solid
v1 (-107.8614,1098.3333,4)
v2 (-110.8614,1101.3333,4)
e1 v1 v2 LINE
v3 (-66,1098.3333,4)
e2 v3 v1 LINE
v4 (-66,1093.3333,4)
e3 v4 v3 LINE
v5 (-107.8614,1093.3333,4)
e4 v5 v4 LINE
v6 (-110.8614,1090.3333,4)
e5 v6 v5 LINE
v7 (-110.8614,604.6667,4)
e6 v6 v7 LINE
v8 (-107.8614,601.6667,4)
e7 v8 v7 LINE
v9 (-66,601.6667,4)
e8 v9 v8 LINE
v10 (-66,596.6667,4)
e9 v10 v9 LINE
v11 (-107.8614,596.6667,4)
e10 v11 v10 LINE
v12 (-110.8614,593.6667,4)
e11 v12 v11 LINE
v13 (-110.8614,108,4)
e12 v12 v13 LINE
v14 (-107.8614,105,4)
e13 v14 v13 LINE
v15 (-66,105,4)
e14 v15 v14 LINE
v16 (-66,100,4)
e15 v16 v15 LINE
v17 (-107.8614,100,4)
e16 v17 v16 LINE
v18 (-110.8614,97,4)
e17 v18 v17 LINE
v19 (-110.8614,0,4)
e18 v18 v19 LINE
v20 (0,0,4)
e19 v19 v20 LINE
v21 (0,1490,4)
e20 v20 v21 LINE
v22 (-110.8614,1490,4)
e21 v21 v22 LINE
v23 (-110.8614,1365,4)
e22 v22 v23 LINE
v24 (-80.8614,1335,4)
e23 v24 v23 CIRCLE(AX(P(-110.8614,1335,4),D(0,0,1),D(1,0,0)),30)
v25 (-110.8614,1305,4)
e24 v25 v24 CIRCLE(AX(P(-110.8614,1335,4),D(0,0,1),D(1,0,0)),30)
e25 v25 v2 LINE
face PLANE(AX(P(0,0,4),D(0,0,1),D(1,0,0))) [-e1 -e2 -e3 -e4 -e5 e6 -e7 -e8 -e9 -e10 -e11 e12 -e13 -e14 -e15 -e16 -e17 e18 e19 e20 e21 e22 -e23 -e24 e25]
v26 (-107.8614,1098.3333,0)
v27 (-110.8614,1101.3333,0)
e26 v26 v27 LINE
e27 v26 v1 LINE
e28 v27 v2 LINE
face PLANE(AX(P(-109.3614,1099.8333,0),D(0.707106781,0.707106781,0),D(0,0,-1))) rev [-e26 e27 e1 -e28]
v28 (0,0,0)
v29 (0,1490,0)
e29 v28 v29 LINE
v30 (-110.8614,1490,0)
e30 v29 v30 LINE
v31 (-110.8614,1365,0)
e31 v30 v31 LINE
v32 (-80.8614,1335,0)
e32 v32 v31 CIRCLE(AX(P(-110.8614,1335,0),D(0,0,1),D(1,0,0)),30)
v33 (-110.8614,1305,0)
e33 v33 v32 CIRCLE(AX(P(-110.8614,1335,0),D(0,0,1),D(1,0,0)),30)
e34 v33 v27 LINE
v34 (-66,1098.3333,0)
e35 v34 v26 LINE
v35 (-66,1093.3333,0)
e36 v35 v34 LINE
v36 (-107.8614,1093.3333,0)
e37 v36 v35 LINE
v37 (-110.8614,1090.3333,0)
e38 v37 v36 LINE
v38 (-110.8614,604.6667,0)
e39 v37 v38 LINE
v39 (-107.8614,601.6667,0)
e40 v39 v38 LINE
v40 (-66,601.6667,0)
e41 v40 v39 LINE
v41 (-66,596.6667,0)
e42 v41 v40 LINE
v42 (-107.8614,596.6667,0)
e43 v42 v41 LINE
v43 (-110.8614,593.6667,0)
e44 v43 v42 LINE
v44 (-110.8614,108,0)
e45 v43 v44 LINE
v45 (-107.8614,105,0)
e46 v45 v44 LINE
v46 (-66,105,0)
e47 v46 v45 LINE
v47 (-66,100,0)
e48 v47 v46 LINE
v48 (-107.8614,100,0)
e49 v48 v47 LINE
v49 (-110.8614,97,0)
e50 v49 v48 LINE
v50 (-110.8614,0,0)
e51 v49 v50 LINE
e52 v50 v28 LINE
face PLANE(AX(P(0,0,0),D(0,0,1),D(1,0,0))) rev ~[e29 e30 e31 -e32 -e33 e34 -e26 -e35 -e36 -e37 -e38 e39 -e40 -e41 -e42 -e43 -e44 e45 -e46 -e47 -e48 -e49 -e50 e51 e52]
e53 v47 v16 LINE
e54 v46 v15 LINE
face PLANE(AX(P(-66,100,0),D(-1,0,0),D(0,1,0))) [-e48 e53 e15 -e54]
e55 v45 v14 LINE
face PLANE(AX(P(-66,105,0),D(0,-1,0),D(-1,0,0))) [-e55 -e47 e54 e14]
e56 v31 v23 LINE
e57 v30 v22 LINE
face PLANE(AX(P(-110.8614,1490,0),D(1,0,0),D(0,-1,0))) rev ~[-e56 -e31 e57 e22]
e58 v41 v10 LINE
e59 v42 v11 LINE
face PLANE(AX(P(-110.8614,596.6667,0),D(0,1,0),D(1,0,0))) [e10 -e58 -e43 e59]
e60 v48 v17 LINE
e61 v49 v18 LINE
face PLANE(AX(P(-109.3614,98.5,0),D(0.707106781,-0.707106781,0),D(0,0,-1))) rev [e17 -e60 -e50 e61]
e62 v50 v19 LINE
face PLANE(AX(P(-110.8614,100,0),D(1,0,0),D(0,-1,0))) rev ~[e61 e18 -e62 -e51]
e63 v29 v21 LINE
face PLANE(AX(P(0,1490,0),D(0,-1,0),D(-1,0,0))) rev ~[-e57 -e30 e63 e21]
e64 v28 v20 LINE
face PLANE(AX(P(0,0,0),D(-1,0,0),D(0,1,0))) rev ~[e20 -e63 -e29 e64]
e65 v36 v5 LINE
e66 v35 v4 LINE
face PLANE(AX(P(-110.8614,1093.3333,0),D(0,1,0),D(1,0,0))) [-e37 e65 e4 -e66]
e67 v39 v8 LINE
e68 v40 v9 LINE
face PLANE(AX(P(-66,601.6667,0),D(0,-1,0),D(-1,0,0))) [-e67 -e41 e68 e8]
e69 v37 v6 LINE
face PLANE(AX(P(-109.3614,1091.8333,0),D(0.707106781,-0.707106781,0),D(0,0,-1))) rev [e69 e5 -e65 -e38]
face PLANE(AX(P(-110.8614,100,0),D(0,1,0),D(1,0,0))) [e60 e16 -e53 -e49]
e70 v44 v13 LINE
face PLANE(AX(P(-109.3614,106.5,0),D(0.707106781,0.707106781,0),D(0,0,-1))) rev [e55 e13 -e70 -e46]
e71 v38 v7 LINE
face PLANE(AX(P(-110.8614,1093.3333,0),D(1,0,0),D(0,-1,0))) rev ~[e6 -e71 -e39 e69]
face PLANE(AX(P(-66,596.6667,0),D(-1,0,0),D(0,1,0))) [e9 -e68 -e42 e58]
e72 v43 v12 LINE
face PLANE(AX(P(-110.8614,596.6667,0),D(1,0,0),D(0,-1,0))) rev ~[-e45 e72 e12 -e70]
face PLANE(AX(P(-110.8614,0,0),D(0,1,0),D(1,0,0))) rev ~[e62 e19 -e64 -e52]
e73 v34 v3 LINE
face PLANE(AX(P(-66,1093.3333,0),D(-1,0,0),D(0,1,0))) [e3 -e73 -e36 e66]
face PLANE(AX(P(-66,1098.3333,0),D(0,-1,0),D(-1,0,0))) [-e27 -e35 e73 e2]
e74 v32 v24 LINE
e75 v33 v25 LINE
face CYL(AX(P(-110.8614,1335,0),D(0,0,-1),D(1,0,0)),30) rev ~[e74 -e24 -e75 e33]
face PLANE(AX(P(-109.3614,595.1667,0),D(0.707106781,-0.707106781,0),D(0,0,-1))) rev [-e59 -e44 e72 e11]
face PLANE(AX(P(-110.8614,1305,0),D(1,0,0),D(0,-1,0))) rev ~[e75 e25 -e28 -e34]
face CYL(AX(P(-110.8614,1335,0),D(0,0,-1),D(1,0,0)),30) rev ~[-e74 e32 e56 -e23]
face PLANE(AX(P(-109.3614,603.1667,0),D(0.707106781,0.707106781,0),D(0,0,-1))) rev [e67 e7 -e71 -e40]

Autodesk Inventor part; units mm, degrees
ref_plane "YZ Plane" through (0, 0, 0) normal (1, 0, 0) x (0, 1, 0)
ref_plane "XZ Plane" through (0, 0, 0) normal (0, 1, 0) x (-1, 0, 0)
ref_plane "XY Plane" through (0, 0, 0) normal (0, 0, 1) x (1, 0, 0)
sketch "Sketch1" plane through (0, 0, 0) normal (0, 0, 1) x (1, 0, 0)
  line L0 (0, 1490) -> (-110.8614, 1490)
  line L1 (-110.8614, 1490) -> (-110.8614, 0)
  line L2 (-110.8614, 0) -> (0, 0)
  line L3 (0, 0) -> (0, 1490)
  line L4 (-110.8614, 100) -> (-66, 100)
  line L5 (-66, 100) -> (-66, 105)
  line L6 (-66, 105) -> (-110.8614, 105)
  line L7 (-110.8614, 105) -> (-110.8614, 100)
  line L8 (-110.8614, 596.6667) -> (-66, 596.6667)
  line L9 (-66, 596.6667) -> (-66, 601.6667)
  line L10 (-66, 601.6667) -> (-110.8614, 601.6667)
  line L11 (-110.8614, 601.6667) -> (-110.8614, 596.6667)
  line L12 (-110.8614, 1093.3333) -> (-66, 1093.3333)
  line L13 (-66, 1093.3333) -> (-66, 1098.3333)
  line L14 (-66, 1098.3333) -> (-110.8614, 1098.3333)
  line L15 (-110.8614, 1098.3333) -> (-110.8614, 1093.3333)
  circle A0 centre (-110.8614, 1335) radius 30
  point P0 (-110.8614, 1098.3333)
  point P1 (-110.8614, 1093.3333)
  point P2 (-110.8614, 601.6667)
  point P3 (-110.8614, 596.6667)
  point P4 (-110.8614, 105)
  point P5 (-110.8614, 1365)
  point P6 (-110.8614, 1305)
  dimension "d0" = 1490
  dimension "d1" = 110.8614
  dimension "d2" = 5
  dimension "d4" = 100
  dimension "d7" = 496.6667
  dimension "d23" = 66
  dimension "d29" = 60
  dimension "d30" = 1335
extrude "Plate1" add sketch "Sketch1" along normal blind 4 contours L3 L2 L1 L4 L5 L6 L8 L9 L10 L12 L13 L14 A0 L0
chamfer "Corner Chamfer1" distance 3 angle 45 6 edges at (-110.8614, 100, 2) (-110.8614, 105, 2) (-110.8614, 596.6667, 2) (-110.8614, 601.6667, 2) (-110.8614, 1098.3333, 2) (-110.8614, 1093.3333, 2)
equation "\"d0\" = Стрингер_длина"
equation "\"d1\" = стрингер_глубина_8"
equation "\"d2\" = паз_под_стрингер_толщина"
equation "\"d7\" = Шаг_шпангоутов"
equation "\"d23\" = паз_под_стрингер_глубина - Thickness"
equation "\"d29\" = 2 * радиус_выреза_под_сварку"
equation "\"d12\" = Thickness"
equation "\"BendRadius\" = Thickness"
equation "\"BendReliefWidth\" = Thickness"
equation "\"BendReliefDepth\" = 0.5 * Thickness"
equation "\"CornerReliefSize\" = 4 * Thickness"
equation "\"MinimumRemnant\" = 2 * Thickness"
equation "\"TransitionRadius\" = BendRadius"
equation "\"JacobiRadiusSize\" = BendRadius"
equation "\"GapSize\" = Thickness"
equation "\"Стрингер_длина\" = 1490"
equation "\"стрингер_глубина_8\" = 110.861434"
equation "\"паз_под_стрингер_толщина\" = 5"
equation "\"Шаг_шпангоутов\" = 496.666667"
equation "\"паз_под_стрингер_глубина\" = 70"
equation "\"Thickness\" = 4"
equation "\"радиус_выреза_под_сварку\" = 30"
properties part number "01014 GBK stringer C8" material "Steel"
